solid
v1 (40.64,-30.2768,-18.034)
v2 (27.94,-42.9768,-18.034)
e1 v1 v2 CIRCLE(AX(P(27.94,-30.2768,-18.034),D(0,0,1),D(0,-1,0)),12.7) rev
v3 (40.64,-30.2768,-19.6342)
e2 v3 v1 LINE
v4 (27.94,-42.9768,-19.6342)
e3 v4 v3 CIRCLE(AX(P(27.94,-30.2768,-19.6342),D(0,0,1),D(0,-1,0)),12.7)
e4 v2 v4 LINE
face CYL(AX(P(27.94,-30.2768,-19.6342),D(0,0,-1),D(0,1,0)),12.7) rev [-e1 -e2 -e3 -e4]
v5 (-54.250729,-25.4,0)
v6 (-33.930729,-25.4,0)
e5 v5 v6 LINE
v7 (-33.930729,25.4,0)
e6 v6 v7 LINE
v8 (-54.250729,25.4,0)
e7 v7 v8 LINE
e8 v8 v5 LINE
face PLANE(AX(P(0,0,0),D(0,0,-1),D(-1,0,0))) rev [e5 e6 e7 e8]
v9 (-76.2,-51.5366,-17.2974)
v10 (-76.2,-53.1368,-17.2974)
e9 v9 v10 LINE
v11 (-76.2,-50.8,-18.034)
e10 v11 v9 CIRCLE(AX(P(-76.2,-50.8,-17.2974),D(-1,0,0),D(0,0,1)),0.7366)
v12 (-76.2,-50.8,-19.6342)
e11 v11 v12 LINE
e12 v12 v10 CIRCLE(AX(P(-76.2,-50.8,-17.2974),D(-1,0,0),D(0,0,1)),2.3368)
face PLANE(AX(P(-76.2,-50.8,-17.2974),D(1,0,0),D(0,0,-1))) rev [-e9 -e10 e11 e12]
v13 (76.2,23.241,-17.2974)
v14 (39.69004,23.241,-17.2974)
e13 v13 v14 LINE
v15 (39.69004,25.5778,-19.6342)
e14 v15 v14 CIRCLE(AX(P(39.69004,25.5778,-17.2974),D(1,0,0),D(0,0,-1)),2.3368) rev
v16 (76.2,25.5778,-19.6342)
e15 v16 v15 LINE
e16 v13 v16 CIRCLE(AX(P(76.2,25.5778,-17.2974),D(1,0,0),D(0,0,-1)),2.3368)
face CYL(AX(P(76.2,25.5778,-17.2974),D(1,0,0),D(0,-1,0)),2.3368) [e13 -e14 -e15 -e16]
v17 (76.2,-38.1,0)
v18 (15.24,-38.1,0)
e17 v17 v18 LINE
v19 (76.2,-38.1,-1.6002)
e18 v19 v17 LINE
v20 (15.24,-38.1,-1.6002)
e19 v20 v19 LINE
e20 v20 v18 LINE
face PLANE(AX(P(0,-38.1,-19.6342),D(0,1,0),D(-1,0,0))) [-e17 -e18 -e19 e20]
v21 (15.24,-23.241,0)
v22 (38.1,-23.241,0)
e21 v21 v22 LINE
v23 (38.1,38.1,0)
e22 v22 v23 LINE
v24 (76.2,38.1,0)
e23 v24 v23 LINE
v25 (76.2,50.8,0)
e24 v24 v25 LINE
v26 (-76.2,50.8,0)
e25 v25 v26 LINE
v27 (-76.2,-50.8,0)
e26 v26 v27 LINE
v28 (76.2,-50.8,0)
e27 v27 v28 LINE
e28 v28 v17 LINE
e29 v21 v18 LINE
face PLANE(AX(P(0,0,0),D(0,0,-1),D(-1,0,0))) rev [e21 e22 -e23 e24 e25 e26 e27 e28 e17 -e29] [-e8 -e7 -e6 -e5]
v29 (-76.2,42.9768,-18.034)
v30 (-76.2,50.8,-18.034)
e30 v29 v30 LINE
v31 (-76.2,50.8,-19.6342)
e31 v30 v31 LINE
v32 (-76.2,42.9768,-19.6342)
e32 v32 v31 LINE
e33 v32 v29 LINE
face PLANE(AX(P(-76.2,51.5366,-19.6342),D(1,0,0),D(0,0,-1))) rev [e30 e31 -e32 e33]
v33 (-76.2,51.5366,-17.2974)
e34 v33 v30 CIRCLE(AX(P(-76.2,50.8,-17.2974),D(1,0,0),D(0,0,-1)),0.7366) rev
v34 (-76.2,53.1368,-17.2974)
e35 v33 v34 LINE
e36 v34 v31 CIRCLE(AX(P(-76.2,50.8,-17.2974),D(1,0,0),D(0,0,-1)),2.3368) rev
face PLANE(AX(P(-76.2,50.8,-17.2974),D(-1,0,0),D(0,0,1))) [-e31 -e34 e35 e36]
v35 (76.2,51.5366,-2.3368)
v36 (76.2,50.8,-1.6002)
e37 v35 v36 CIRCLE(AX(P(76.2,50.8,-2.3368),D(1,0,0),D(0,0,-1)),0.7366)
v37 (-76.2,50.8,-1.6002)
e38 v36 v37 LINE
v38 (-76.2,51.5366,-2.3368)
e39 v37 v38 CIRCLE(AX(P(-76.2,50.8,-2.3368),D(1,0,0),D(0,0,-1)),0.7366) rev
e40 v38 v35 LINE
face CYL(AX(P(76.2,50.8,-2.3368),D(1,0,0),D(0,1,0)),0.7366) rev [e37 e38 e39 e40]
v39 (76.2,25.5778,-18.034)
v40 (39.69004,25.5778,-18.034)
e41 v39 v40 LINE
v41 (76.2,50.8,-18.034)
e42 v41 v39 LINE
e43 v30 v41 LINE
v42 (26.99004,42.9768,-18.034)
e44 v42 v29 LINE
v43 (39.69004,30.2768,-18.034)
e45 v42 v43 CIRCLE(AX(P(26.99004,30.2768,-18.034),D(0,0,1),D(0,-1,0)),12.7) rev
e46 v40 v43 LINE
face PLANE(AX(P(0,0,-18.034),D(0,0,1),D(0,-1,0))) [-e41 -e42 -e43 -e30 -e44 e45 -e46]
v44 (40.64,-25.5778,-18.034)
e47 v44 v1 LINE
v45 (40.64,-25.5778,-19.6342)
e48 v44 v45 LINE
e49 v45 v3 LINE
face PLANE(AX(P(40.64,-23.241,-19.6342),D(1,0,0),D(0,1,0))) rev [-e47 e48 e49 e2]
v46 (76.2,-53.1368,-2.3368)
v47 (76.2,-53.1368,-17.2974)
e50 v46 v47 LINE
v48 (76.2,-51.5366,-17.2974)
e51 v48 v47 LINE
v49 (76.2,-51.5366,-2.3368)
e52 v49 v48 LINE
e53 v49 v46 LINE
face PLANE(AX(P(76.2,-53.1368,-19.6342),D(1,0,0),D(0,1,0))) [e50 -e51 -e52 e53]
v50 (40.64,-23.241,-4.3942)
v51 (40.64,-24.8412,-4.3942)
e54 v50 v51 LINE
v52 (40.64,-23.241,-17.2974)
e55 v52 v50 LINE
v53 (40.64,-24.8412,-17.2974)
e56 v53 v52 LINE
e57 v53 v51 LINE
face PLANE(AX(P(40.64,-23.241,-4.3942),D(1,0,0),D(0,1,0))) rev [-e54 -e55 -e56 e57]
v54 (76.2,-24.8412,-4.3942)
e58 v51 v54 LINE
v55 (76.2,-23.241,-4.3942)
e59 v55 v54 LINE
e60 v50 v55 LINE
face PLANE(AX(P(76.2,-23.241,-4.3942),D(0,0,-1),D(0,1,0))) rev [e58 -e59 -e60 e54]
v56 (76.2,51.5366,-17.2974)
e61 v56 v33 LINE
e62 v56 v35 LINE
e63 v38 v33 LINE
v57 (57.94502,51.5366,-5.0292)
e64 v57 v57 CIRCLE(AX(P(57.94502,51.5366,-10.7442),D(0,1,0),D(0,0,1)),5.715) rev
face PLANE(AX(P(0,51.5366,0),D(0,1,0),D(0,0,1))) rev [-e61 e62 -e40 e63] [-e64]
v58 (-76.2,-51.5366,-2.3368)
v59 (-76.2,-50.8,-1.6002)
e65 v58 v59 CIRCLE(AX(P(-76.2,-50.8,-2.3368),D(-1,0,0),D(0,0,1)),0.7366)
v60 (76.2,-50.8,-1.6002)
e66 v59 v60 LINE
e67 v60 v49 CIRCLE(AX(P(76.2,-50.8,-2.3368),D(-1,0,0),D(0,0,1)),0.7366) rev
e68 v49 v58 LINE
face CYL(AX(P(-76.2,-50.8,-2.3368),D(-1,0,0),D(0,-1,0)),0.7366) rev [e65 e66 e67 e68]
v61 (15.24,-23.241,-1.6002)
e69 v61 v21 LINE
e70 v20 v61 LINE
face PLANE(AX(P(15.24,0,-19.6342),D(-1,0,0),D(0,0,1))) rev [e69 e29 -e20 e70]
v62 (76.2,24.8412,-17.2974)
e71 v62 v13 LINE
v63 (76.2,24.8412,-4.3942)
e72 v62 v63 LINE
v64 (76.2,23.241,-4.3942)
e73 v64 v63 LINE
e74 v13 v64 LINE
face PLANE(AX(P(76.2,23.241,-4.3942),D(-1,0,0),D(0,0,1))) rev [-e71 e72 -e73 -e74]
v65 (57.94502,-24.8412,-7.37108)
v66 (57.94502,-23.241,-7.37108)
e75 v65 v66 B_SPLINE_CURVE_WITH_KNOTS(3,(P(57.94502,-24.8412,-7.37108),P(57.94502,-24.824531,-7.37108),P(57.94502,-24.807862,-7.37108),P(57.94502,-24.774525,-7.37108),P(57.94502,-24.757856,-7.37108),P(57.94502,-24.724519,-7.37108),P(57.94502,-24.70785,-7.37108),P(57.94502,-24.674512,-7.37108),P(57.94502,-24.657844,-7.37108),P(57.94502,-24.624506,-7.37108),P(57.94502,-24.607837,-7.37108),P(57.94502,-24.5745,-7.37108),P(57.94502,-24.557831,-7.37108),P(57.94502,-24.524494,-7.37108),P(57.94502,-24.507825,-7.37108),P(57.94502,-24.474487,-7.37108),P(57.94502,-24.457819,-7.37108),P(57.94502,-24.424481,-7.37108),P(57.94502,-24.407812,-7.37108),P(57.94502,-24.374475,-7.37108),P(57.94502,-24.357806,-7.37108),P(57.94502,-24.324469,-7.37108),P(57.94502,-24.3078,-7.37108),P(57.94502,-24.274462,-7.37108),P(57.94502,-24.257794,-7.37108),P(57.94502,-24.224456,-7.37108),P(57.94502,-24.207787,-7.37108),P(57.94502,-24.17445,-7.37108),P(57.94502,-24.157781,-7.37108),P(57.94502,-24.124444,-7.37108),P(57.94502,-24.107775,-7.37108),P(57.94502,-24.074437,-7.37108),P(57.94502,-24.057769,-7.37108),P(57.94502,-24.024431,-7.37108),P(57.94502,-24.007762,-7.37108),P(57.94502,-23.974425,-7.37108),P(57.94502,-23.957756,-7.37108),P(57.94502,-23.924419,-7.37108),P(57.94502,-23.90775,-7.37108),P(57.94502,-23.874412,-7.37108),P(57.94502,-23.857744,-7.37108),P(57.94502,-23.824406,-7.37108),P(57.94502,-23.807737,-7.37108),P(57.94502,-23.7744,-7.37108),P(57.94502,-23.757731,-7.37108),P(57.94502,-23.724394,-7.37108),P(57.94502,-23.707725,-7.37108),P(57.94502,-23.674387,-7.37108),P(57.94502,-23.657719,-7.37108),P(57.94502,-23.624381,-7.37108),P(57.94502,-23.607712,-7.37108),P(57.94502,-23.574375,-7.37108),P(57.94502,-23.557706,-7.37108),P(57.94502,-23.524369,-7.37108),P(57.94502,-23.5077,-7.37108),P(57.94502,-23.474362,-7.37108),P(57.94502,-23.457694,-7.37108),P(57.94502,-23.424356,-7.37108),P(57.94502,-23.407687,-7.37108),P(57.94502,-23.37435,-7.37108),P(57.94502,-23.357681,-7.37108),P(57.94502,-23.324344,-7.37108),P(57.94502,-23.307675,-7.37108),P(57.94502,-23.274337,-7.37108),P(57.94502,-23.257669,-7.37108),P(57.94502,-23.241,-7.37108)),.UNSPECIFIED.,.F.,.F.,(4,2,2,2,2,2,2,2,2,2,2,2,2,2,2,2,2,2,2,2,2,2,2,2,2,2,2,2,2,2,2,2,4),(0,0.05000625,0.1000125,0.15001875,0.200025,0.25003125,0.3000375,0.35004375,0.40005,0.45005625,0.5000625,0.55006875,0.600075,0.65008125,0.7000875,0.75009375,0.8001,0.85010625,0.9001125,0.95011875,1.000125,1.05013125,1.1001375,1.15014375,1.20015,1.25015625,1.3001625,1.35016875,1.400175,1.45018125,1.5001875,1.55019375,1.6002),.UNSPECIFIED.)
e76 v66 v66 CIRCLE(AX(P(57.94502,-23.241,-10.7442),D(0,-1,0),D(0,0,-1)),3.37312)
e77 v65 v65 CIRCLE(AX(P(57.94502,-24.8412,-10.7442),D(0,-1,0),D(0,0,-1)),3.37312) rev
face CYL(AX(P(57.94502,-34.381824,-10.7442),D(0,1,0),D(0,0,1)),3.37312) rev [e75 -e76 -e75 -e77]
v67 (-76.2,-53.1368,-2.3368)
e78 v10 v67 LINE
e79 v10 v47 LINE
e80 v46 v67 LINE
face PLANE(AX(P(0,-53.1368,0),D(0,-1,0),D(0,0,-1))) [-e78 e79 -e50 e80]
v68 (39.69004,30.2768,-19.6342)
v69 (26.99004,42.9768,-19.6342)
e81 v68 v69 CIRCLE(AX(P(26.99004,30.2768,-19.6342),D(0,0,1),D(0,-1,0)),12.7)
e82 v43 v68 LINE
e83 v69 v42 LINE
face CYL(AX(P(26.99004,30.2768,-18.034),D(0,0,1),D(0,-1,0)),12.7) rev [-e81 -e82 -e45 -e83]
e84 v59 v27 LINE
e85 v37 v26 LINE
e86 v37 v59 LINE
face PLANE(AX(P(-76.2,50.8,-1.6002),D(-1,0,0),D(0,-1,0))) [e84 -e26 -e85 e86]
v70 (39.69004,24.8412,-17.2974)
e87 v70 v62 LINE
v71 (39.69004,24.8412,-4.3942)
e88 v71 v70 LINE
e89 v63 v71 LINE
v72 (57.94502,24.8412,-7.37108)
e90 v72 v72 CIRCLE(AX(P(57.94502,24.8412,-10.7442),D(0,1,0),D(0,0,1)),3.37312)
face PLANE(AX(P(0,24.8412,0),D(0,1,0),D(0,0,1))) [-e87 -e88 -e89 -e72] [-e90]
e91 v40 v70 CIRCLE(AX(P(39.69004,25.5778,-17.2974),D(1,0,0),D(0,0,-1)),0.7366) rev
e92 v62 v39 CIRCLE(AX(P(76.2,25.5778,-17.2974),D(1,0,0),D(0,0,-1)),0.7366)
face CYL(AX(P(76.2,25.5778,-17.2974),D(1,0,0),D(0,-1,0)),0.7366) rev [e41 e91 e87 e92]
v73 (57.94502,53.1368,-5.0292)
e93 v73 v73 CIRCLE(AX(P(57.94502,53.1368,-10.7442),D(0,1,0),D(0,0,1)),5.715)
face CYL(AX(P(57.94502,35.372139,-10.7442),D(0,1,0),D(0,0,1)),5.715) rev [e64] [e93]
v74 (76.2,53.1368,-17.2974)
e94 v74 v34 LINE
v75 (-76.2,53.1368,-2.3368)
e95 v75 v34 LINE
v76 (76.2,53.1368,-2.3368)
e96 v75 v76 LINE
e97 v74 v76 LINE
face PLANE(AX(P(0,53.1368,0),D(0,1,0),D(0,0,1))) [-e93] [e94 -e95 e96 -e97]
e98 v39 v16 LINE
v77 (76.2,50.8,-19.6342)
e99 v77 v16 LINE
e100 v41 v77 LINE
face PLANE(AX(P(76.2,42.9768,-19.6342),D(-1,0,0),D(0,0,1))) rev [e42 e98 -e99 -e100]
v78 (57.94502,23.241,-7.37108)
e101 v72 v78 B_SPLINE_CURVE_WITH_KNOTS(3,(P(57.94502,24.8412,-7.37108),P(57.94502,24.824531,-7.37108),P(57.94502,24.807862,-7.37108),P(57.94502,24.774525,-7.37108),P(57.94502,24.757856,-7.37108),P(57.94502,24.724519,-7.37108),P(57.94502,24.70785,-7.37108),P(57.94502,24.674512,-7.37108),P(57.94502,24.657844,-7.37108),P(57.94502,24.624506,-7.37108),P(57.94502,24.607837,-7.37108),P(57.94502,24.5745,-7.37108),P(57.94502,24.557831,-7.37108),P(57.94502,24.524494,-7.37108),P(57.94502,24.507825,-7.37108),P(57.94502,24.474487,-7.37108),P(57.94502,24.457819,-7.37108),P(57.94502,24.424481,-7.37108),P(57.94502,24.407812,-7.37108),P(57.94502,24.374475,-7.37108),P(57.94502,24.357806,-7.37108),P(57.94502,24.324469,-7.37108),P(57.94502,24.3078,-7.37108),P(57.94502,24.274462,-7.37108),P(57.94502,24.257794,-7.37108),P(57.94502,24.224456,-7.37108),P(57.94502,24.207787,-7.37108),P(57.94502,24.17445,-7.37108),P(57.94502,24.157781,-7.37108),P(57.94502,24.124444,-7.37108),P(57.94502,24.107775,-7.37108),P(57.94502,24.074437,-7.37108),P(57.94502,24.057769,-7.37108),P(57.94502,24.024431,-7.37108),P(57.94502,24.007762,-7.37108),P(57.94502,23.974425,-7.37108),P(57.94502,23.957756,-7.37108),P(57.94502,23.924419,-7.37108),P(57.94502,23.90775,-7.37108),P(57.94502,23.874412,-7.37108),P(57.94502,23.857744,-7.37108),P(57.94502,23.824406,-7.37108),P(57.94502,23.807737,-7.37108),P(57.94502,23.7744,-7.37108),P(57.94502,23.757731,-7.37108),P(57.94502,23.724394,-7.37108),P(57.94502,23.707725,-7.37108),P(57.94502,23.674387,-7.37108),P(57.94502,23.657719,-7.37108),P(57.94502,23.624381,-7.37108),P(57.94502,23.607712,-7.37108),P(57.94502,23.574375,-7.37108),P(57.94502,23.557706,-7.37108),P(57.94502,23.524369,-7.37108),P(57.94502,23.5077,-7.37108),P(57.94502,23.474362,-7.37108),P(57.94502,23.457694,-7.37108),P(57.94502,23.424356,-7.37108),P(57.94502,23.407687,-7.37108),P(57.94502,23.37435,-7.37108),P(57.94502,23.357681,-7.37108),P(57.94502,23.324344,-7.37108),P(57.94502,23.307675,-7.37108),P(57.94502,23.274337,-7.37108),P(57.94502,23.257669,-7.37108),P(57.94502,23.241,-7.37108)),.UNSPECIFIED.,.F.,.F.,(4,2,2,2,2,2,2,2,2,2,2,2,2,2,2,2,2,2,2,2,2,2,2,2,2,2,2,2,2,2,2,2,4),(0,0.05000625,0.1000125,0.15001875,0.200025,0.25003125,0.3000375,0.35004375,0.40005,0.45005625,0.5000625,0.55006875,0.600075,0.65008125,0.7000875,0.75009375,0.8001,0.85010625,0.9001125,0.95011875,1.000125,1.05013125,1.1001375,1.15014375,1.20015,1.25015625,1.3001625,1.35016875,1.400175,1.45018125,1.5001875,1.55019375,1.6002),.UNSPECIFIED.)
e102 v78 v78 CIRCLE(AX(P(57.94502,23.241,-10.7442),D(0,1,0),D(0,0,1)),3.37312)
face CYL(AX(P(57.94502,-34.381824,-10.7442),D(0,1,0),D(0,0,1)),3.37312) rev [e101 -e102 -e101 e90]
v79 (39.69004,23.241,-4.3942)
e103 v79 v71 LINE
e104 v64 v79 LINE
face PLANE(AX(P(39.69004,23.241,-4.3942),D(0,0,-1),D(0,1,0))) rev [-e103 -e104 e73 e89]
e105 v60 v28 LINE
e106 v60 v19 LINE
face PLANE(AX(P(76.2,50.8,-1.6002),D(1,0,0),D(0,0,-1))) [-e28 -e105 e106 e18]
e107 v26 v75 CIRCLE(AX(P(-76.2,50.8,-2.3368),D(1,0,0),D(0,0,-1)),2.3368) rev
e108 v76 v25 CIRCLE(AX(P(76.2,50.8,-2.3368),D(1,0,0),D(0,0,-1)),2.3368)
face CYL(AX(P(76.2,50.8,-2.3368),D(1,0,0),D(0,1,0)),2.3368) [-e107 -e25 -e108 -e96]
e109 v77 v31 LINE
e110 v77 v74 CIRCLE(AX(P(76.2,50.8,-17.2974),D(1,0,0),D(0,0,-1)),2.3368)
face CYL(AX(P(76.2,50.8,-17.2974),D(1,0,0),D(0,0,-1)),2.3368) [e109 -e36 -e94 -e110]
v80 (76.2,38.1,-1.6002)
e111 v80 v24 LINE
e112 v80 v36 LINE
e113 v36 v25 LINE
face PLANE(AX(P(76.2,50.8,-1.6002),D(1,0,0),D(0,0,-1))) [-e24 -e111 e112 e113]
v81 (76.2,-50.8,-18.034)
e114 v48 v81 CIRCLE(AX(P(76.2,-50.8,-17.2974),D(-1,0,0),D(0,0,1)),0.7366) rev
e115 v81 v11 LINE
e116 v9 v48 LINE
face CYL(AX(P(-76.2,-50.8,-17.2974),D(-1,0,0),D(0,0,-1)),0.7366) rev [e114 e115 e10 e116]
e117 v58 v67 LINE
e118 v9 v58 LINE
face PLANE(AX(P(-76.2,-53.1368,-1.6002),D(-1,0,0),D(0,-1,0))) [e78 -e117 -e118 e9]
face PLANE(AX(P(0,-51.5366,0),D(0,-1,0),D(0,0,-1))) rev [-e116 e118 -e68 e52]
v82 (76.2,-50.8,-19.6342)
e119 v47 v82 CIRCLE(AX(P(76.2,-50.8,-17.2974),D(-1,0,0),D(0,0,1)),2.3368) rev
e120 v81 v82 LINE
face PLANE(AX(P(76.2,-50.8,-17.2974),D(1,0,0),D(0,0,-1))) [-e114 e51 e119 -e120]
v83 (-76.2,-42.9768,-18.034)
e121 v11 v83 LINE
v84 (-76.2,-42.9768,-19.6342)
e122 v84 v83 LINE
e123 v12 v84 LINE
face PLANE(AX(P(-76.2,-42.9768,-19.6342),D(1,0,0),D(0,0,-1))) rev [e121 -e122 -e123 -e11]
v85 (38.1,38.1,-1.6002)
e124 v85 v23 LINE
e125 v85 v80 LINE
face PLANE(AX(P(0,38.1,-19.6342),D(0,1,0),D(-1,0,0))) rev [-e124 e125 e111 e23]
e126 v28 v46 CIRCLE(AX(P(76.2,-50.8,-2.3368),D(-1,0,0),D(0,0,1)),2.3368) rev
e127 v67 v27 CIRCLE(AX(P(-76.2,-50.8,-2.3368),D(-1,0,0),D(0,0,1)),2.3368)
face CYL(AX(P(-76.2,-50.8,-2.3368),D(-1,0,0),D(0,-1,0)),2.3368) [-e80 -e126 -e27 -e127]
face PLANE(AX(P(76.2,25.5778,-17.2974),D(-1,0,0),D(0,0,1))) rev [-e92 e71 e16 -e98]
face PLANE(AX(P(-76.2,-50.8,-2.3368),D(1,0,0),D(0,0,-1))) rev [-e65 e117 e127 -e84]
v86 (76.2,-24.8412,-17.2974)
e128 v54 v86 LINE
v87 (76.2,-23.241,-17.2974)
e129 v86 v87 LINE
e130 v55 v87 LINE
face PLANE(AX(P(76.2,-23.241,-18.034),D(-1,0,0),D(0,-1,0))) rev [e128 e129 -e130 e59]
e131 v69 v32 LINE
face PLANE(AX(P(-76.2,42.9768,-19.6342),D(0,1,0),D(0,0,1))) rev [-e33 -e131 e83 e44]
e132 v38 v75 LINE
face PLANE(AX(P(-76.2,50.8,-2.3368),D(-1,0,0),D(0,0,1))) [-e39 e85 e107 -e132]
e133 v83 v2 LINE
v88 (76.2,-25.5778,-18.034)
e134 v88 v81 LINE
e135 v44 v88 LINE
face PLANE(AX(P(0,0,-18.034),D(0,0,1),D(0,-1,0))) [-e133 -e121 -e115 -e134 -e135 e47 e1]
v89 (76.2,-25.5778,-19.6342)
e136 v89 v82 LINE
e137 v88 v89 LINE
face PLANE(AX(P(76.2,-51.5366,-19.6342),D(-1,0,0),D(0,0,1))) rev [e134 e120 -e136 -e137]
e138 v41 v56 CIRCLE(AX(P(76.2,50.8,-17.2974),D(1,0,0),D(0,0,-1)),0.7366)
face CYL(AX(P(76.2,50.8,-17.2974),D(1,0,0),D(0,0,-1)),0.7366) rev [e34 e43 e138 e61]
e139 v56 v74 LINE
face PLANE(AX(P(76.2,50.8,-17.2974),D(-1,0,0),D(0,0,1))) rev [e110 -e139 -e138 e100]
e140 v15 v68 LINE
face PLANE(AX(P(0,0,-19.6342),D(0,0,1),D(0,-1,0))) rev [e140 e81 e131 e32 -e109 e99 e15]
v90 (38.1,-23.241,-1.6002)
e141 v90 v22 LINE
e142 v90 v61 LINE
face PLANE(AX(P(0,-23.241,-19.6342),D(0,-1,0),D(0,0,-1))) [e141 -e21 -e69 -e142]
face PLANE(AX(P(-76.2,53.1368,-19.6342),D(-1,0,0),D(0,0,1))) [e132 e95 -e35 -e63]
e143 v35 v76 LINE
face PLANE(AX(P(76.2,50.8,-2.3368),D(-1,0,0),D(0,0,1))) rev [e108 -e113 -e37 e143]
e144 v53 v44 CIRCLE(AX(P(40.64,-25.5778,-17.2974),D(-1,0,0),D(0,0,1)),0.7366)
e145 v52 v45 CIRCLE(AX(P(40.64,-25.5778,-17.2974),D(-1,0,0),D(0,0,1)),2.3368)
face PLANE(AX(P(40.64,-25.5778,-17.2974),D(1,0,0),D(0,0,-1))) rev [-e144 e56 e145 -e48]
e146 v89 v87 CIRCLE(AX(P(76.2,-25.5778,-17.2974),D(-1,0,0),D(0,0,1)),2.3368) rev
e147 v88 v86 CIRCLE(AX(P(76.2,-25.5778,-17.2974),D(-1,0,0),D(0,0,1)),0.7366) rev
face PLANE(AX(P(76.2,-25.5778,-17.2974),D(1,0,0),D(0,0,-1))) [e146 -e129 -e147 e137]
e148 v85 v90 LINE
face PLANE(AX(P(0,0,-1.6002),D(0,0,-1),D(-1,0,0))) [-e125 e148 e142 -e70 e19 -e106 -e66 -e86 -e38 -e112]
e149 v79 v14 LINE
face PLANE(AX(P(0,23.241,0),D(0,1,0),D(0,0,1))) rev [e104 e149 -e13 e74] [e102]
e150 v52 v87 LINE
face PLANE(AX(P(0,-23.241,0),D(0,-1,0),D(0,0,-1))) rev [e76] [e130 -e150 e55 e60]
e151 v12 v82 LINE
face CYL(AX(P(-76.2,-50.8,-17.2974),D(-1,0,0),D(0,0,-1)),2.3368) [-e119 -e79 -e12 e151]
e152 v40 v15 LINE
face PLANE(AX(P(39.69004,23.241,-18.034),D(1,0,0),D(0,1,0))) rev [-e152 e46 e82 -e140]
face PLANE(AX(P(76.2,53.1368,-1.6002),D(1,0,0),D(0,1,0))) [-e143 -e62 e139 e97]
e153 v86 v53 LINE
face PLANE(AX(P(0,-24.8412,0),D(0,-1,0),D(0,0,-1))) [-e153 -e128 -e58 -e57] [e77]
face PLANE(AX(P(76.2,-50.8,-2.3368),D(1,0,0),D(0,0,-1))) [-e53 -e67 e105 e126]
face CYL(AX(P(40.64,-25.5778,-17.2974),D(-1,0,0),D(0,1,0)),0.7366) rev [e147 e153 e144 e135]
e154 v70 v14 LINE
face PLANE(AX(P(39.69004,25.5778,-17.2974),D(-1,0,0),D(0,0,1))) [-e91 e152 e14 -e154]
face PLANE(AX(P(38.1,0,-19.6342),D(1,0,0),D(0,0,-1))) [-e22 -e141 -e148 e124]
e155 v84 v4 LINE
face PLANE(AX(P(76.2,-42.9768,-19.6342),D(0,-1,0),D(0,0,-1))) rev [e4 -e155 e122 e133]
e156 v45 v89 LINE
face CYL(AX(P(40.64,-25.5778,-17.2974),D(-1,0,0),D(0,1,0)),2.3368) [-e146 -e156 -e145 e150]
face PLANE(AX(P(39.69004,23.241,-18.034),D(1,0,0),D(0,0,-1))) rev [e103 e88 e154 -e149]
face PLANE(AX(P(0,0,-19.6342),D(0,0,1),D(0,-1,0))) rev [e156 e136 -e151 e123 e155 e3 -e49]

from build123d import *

# Parameters (mm, degrees)
SKETCH1_W                      = 152.4
SKETCH1_H                      = 101.6
BASE_FLANGE1_DEPTH             = 1.6002
EDGE_FLANGE1_DEPTH             = 152.4
EDGE_FLANGE2_DEPTH             = 152.4
CUT_EXTRUDE1_DEPTH             = 95.949783169
EDGE_FLANGE7_STRIP_W           = 7.874
EDGE_FLANGE7_STRIP_H           = 1.6002
EDGE_FLANGE7_STRIP_CUT_DEPTH   = 152.4
EDGE_FLANGE7_DEPTH             = 152.4
EDGE_FLANGE8_STRIP_W           = 7.874
EDGE_FLANGE8_STRIP_H           = 1.6002
EDGE_FLANGE8_STRIP_CUT_DEPTH   = 152.4
EDGE_FLANGE8_DEPTH             = 152.4
SKETCH35_W                     = 35.56
SKETCH35_H                     = 1.6002
BOSS_EXTRUDE1_DEPTH            = 19.7358
EDGE_FLANGE9_STRIP_W           = 7.874
EDGE_FLANGE9_STRIP_H           = 1.6002
EDGE_FLANGE9_STRIP_CUT_DEPTH   = 35.56
EDGE_FLANGE9_DEPTH             = 35.56
SKETCH39_W                     = 36.50996
SKETCH39_H                     = 1.6002
BOSS_EXTRUDE2_DEPTH            = 19.7358
EDGE_FLANGE10_STRIP_W          = 7.874
EDGE_FLANGE10_STRIP_H          = 1.6002
EDGE_FLANGE10_STRIP_CUT_DEPTH  = 36.50996
EDGE_FLANGE10_DEPTH            = 36.50996
CUT_EXTRUDE2_REACH             = 111.661
SKETCH43_R                     = 3.37312
CUT_EXTRUDE2_DIRECTION_2_REACH = 111.661
FILLET1_R                      = 12.7
SKETCH45_R                     = 5.715
CUT_EXTRUDE3_DEPTH             = 1.6002


# Sheet-metal steps are written as plain solids
with BuildPart() as part:
    # Sketch1 → Base-Flange1 (new body)
    with BuildSketch(Plane.XY):
        Rectangle(SKETCH1_W, SKETCH1_H)
    extrude(amount=-BASE_FLANGE1_DEPTH)

    # Edge-Flange1 section (across the edge) → Edge-Flange1 (add)
    with BuildSketch(Plane(origin=(-76.2, 51.5366, -1.6002), x_dir=(0, -1, 0), z_dir=(1, 0, 0))):
        with BuildLine():
            Line((-1.6002, 0.7366), (-1.6002, 18.034))
            Line((-1.6002, 18.034), (0, 18.034))
            Line((0, 18.034), (0, 0.7366))
            ThreePointArc((0, 0.7366), (0.215745145, 0.215745145), (0.7366, 0))
            Line((0.7366, 0), (0.7366, -1.6002))
            ThreePointArc((0.7366, -1.6002), (-0.915767126, -0.915767126), (-1.6002, 0.7366))
        make_face()
    extrude(amount=EDGE_FLANGE1_DEPTH)

    # Edge-Flange2 section (across the edge) → Edge-Flange2 (add)
    with BuildSketch(Plane(origin=(76.2, -51.5366, -1.6002), x_dir=(0, 1, 0), z_dir=(-1, 0, 0))):
        with BuildLine():
            Line((-1.6002, 0.7366), (-1.6002, 18.034))
            Line((-1.6002, 18.034), (0, 18.034))
            Line((0, 18.034), (0, 0.7366))
            ThreePointArc((0, 0.7366), (0.215745145, 0.215745145), (0.7366, 0))
            Line((0.7366, 0), (0.7366, -1.6002))
            ThreePointArc((0.7366, -1.6002), (-0.915767126, -0.915767126), (-1.6002, 0.7366))
        make_face()
    extrude(amount=EDGE_FLANGE2_DEPTH)

    # Sketch14 → Cut-Extrude1 (cut, through all)
    with BuildSketch(Plane.XY):
        Polygon((76.2, -38.1), (76.2, 38.1), (38.1, 38.1), (38.1, -23.241), (15.24, -23.241), (15.24, -38.1), align=None)
    extrude(amount=-CUT_EXTRUDE1_DEPTH, mode=Mode.SUBTRACT)

    # Edge-Flange7 strip (across the edge) → Edge-Flange7 strip cut (cut)
    with BuildSketch(Plane(origin=(76.2, -51.5366, -19.6342), x_dir=(0, 0, 1), z_dir=(-1, 0, 0))):
        with Locations((-1.6002, -0.8001)):
            Rectangle(EDGE_FLANGE7_STRIP_W, EDGE_FLANGE7_STRIP_H)
    extrude(amount=EDGE_FLANGE7_STRIP_CUT_DEPTH, mode=Mode.SUBTRACT)

    # Edge-Flange7 section (across the edge) → Edge-Flange7 (add)
    with BuildSketch(Plane(origin=(76.2, -51.5366, -19.6342), x_dir=(0, 0, 1), z_dir=(-1, 0, 0))):
        with BuildLine():
            Line((0, 0.7366), (0, 8.5598))
            Line((0, 8.5598), (1.6002, 8.5598))
            Line((1.6002, 8.5598), (1.6002, 0.7366))
            ThreePointArc((1.6002, 0.7366), (1.815945145, 0.215745145), (2.3368, 0))
            Line((2.3368, 0), (2.3368, -1.6002))
            ThreePointArc((2.3368, -1.6002), (0.684432874, -0.915767126), (0, 0.7366))
        make_face()
    extrude(amount=EDGE_FLANGE7_DEPTH)

    # Edge-Flange8 strip (across the edge) → Edge-Flange8 strip cut (cut)
    with BuildSketch(Plane(origin=(-76.2, 51.5366, -19.6342), x_dir=(0, 0, 1), z_dir=(1, 0, 0))):
        with Locations((-1.6002, -0.8001)):
            Rectangle(EDGE_FLANGE8_STRIP_W, EDGE_FLANGE8_STRIP_H)
    extrude(amount=EDGE_FLANGE8_STRIP_CUT_DEPTH, mode=Mode.SUBTRACT)

    # Edge-Flange8 section (across the edge) → Edge-Flange8 (add)
    with BuildSketch(Plane(origin=(-76.2, 51.5366, -19.6342), x_dir=(0, 0, 1), z_dir=(1, 0, 0))):
        with BuildLine():
            Line((0, 0.7366), (0, 8.5598))
            Line((0, 8.5598), (1.6002, 8.5598))
            Line((1.6002, 8.5598), (1.6002, 0.7366))
            ThreePointArc((1.6002, 0.7366), (1.815945145, 0.215745145), (2.3368, 0))
            Line((2.3368, 0), (2.3368, -1.6002))
            ThreePointArc((2.3368, -1.6002), (0.684432874, -0.915767126), (0, 0.7366))
        make_face()
    extrude(amount=EDGE_FLANGE8_DEPTH)

    # Sketch35 → Boss-Extrude1 (add)
    with BuildSketch(Plane(origin=(0, -42.9768, 0), x_dir=(1, 0, 0), z_dir=(0, 1, 0))):
        with Locations((58.42, 18.8341)):
            Rectangle(SKETCH35_W, SKETCH35_H)
    extrude(amount=BOSS_EXTRUDE1_DEPTH)

    # Edge-Flange9 strip (across the edge) → Edge-Flange9 strip cut (cut)
    with BuildSketch(Plane(origin=(76.2, -23.241, -18.034), x_dir=(0, -1, 0), z_dir=(-1, 0, 0))):
        with Locations((-1.6002, -0.8001)):
            Rectangle(EDGE_FLANGE9_STRIP_W, EDGE_FLANGE9_STRIP_H)
    extrude(amount=EDGE_FLANGE9_STRIP_CUT_DEPTH, mode=Mode.SUBTRACT)

    # Edge-Flange9 section (across the edge) → Edge-Flange9 (add)
    with BuildSketch(Plane(origin=(76.2, -23.241, -18.034), x_dir=(0, -1, 0), z_dir=(-1, 0, 0))):
        with BuildLine():
            Line((0, 0.7366), (0, 13.6398))
            Line((0, 13.6398), (1.6002, 13.6398))
            Line((1.6002, 13.6398), (1.6002, 0.7366))
            ThreePointArc((1.6002, 0.7366), (1.815945145, 0.215745145), (2.3368, 0))
            Line((2.3368, 0), (2.3368, -1.6002))
            ThreePointArc((2.3368, -1.6002), (0.684432874, -0.915767126), (0, 0.7366))
        make_face()
    extrude(amount=EDGE_FLANGE9_DEPTH)

    # Sketch39 → Boss-Extrude2 (add)
    with BuildSketch(Plane.XZ.offset(-42.9768)):
        with Locations((57.94502, -18.8341)):
            Rectangle(SKETCH39_W, SKETCH39_H)
    extrude(amount=BOSS_EXTRUDE2_DEPTH)

    # Edge-Flange10 strip (across the edge) → Edge-Flange10 strip cut (cut)
    with BuildSketch(Plane(origin=(39.69004, 23.241, -18.034), x_dir=(0, 1, 0), z_dir=(1, 0, 0))):
        with Locations((-1.6002, -0.8001)):
            Rectangle(EDGE_FLANGE10_STRIP_W, EDGE_FLANGE10_STRIP_H)
    extrude(amount=EDGE_FLANGE10_STRIP_CUT_DEPTH, mode=Mode.SUBTRACT)

    # Edge-Flange10 section (across the edge) → Edge-Flange10 (add)
    with BuildSketch(Plane(origin=(39.69004, 23.241, -18.034), x_dir=(0, 1, 0), z_dir=(1, 0, 0))):
        with BuildLine():
            Line((0, 0.7366), (0, 13.6398))
            Line((0, 13.6398), (1.6002, 13.6398))
            Line((1.6002, 13.6398), (1.6002, 0.7366))
            ThreePointArc((1.6002, 0.7366), (1.815945145, 0.215745145), (2.3368, 0))
            Line((2.3368, 0), (2.3368, -1.6002))
            ThreePointArc((2.3368, -1.6002), (0.684432874, -0.915767126), (0, 0.7366))
        make_face()
    extrude(amount=EDGE_FLANGE10_DEPTH)

    # Cut-Extrude2: up to this face of the body (flat: up to its plane)
    cut_extrude2_end = Plane(part.part.faces().sort_by_distance((58.42, -24.8412, -10.8458))[0])
    # Sketch43 → Cut-Extrude2 (cut, up to the picked face)
    with BuildSketch(Plane(origin=(0, -23.241, 0), x_dir=(1, 0, 0), z_dir=(0, 1, 0)), mode=Mode.PRIVATE) as cut_extrude2_sk1:
        with Locations(Location((57.94502, 10.7442, 0), (0, 0, 270))):
            Circle(SKETCH43_R)
    cut_extrude2_tool1 = split(extrude(cut_extrude2_sk1.sketch, amount=-CUT_EXTRUDE2_REACH, mode=Mode.PRIVATE), bisect_by=cut_extrude2_end, keep=Keep.BOTH, mode=Mode.PRIVATE)
    add(cut_extrude2_tool1.solids().sort_by(Axis((57.94502, -23.241, -10.7442), (0, -1, 0)))[0], mode=Mode.SUBTRACT)

    # Cut-Extrude2 direction 2: up to this face of the body (flat: up to its plane)
    cut_extrude2_direction_2_end = Plane(part.part.faces().sort_by_distance((57.94502, 24.8412, -10.8458))[0])
    # Sketch43 → Cut-Extrude2 direction 2 (cut, up to the picked face)
    with BuildSketch(Plane(origin=(0, -23.241, 0), x_dir=(1, 0, 0), z_dir=(0, 1, 0)), mode=Mode.PRIVATE) as cut_extrude2_direction_2_sk1:
        with Locations(Location((57.94502, 10.7442, 0), (0, 0, 270))):
            Circle(SKETCH43_R)
    cut_extrude2_direction_2_tool1 = split(extrude(cut_extrude2_direction_2_sk1.sketch, amount=CUT_EXTRUDE2_DIRECTION_2_REACH, mode=Mode.PRIVATE), bisect_by=cut_extrude2_direction_2_end, keep=Keep.BOTH, mode=Mode.PRIVATE)
    add(cut_extrude2_direction_2_tool1.solids().sort_by(Axis((57.94502, -23.241, -10.7442), (0, 1, 0)))[0], mode=Mode.SUBTRACT)

    # Fillet1
    fillet1_edges = [part.edges().sort_by_distance(p)[0] for p in [
        (40.64, -42.9768, -18.8341),
        (39.69004, 42.9768, -18.8341),
    ]]
    fillet(fillet1_edges, radius=FILLET1_R)

    # Sketch45 → Cut-Extrude3 (cut)
    with BuildSketch(Plane(origin=(0, 53.1368, 0), x_dir=(1, 0, 0), z_dir=(0, 1, 0))):
        with Locations(Location((57.94502, 10.7442, 0), (0, 0, 270))):
            Circle(SKETCH45_R)
    extrude(amount=-CUT_EXTRUDE3_DEPTH, mode=Mode.SUBTRACT)


solid = part.part
